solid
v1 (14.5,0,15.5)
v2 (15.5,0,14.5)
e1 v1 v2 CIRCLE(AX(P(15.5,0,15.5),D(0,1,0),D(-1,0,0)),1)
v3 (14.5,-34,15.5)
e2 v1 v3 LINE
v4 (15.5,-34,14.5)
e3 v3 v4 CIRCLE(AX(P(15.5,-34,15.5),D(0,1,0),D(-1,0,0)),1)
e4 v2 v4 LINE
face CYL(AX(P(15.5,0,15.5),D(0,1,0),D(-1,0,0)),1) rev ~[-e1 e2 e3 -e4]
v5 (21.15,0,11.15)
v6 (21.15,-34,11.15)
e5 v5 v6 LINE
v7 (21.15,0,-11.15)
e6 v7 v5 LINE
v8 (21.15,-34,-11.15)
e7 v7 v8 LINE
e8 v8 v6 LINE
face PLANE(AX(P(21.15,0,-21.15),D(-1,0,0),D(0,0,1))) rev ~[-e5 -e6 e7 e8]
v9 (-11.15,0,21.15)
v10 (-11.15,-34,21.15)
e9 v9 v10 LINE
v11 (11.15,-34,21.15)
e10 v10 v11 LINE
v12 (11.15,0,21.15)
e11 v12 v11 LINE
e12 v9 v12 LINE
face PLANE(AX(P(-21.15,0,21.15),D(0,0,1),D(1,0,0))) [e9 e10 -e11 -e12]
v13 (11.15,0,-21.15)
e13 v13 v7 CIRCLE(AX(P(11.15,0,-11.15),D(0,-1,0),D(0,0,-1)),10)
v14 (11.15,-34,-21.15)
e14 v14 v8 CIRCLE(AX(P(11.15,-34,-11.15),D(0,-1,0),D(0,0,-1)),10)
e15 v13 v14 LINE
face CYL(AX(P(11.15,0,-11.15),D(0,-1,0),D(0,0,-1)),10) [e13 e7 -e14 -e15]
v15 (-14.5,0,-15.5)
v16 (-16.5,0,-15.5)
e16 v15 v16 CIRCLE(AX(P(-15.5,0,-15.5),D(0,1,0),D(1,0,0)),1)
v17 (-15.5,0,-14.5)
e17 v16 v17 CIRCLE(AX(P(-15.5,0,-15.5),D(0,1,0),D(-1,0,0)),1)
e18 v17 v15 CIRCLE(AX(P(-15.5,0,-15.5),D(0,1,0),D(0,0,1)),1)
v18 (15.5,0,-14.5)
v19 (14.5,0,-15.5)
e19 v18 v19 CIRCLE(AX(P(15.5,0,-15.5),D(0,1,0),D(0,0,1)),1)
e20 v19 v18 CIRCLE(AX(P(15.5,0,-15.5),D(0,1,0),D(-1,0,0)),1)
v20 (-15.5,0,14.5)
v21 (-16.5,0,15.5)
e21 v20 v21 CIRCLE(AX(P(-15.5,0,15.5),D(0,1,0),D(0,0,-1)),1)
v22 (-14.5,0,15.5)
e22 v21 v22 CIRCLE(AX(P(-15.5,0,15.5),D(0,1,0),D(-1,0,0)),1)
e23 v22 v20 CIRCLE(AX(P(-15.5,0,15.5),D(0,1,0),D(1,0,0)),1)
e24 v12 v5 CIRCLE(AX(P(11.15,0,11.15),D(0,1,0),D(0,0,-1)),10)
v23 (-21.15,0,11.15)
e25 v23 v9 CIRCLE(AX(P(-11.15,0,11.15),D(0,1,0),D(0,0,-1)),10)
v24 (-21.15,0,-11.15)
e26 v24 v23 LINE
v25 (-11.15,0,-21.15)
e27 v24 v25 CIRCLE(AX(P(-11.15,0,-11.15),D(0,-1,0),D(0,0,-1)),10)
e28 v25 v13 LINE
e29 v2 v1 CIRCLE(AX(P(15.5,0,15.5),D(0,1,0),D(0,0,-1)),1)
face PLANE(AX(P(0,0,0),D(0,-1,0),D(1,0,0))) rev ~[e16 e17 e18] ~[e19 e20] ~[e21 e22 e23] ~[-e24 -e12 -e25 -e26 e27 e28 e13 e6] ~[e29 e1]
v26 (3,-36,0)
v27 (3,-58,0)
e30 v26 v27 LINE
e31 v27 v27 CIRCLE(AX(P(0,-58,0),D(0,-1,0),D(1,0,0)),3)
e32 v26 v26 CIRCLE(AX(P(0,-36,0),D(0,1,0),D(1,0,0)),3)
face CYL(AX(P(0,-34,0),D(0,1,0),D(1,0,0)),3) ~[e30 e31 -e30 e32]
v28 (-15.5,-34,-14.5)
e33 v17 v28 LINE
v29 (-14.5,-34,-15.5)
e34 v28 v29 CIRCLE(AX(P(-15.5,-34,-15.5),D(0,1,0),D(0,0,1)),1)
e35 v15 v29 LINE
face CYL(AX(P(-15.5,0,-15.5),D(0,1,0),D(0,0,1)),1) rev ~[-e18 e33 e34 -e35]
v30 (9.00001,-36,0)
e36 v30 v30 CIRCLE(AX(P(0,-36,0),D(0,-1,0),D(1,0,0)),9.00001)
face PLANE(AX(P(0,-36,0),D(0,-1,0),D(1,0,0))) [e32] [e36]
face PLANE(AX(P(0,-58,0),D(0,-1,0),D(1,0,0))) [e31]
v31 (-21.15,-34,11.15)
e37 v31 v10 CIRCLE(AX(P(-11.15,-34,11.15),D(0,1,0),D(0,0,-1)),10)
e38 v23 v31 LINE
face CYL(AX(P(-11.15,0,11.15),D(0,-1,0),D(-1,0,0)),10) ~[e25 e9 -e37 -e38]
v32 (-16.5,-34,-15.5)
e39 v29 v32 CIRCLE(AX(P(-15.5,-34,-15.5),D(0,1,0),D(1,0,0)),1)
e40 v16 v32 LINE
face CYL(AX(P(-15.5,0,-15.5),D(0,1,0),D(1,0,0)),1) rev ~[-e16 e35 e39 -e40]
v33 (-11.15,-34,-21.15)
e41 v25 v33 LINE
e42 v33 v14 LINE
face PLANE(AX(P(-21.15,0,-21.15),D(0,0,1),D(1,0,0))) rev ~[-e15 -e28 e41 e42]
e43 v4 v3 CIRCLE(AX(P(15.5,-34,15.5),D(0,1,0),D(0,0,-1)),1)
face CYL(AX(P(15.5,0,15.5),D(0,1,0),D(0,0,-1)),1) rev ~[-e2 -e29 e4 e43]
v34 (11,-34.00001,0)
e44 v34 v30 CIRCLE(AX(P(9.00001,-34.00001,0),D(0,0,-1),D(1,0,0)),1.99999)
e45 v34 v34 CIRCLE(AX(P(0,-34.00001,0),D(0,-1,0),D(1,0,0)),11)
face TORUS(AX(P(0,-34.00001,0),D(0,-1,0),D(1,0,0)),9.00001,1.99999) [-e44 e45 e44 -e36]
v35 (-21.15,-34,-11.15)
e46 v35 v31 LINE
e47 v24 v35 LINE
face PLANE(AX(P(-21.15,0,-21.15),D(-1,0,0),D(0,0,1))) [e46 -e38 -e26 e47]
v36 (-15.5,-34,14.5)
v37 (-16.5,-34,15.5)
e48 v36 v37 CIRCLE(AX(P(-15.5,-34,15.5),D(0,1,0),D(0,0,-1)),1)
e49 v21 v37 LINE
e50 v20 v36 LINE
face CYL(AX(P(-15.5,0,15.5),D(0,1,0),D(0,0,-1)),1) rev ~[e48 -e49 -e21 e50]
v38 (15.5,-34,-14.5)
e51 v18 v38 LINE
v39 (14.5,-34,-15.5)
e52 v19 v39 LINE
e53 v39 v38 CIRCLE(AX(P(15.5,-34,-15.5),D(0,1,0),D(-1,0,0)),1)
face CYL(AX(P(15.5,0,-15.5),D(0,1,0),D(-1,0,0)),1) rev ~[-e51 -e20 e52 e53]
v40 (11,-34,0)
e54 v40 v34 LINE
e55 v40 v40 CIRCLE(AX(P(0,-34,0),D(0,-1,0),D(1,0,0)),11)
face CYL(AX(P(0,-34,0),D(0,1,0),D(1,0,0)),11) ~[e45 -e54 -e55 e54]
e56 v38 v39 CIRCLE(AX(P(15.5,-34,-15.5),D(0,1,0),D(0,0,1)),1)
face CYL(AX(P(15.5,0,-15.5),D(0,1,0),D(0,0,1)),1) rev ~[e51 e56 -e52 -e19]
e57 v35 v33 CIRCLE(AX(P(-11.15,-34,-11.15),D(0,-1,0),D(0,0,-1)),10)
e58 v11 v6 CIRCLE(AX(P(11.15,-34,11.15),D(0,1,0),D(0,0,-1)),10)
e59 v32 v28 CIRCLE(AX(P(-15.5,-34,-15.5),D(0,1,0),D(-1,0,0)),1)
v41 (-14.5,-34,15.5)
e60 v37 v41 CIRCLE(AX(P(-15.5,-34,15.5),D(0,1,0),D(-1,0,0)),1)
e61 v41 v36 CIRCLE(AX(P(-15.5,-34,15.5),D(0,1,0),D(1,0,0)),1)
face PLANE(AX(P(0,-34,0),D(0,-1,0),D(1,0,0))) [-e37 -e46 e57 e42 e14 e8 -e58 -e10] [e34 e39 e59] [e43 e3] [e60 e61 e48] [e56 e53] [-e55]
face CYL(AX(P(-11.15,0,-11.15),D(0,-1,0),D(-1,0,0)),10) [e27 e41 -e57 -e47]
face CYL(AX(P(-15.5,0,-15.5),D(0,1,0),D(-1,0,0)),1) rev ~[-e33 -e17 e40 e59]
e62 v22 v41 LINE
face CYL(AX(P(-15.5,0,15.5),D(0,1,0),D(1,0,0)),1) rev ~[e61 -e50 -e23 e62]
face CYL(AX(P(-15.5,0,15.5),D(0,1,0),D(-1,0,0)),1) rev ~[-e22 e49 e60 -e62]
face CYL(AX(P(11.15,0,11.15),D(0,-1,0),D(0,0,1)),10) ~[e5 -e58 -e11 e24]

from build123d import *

# Parameters (mm, degrees)
F0_W     = 42.3
F0_H     = 42.3
F1_DEPTH = 34
F2_R     = 3
F3_DEPTH = 24
F5_DEPTH = 58.001
F6_R     = 11
F7_DEPTH = 2
F8_R     = 10
F9_R     = 1.99999


# Not quite as in the source:
# - a fillet or chamfer is up to 0.001 mm smaller than in the source, because OpenCascade refuses the exact size


with BuildPart() as f1:
    # F0 (on Front) → F1 (new body)
    with BuildSketch(Plane.XZ):
        Rectangle(F0_W, F0_H)
    extrude(amount=F1_DEPTH)

    # F2 (on face) → F3 (join)
    with BuildSketch(Plane.XZ.offset(34)):
        Circle(F2_R)
    extrude(amount=F3_DEPTH)

    # F4 (on face) → F5 (cut, through all)
    with BuildSketch(Plane(origin=(0, 0, 0), x_dir=(-1, 0, 0), z_dir=(0, 1, 0))):
        with BuildLine():
            Line((-15.5, 14.5), (-15.5, 15.5))
            Line((-15.5, 15.5), (-14.5, 15.5))
            ThreePointArc((-14.5, 15.5), (-16.2071067812, 16.2071067812), (-15.5, 14.5))
        make_face()
        with BuildLine():
            ThreePointArc((16.5, 15.5), (15.5, 16.5), (14.5, 15.5))
            Line((14.5, 15.5), (15.5, 15.5))
            Line((15.5, 15.5), (15.5, 14.5))
            ThreePointArc((15.5, 14.5), (16.2071067812, 14.7928932188), (16.5, 15.5))
        make_face()
        with BuildLine():
            Line((-15.5, -15.5), (-15.5, -14.5))
            ThreePointArc((-15.5, -14.5), (-16.2071067812, -16.2071067812), (-14.5, -15.5))
            Line((-14.5, -15.5), (-15.5, -15.5))
        make_face()
        with BuildLine():
            ThreePointArc((16.5, -15.5), (16.2071067812, -14.7928932188), (15.5, -14.5))
            Line((15.5, -14.5), (15.5, -15.5))
            Line((15.5, -15.5), (14.5, -15.5))
            ThreePointArc((14.5, -15.5), (15.5, -16.5), (16.5, -15.5))
        make_face()
        with BuildLine():
            Line((15.5, 15.5), (14.5, 15.5))
            ThreePointArc((14.5, 15.5), (14.7928932188, 14.7928932188), (15.5, 14.5))
            Line((15.5, 14.5), (15.5, 15.5))
        make_face()
        with BuildLine():
            Line((-14.5, 15.5), (-15.5, 15.5))
            Line((-15.5, 15.5), (-15.5, 14.5))
            ThreePointArc((-15.5, 14.5), (-14.7928932188, 14.7928932188), (-14.5, 15.5))
        make_face()
        with BuildLine():
            ThreePointArc((-14.5, -15.5), (-14.7928932188, -14.7928932188), (-15.5, -14.5))
            Line((-15.5, -14.5), (-15.5, -15.5))
            Line((-15.5, -15.5), (-14.5, -15.5))
        make_face()
        with BuildLine():
            Line((15.5, -15.5), (15.5, -14.5))
            ThreePointArc((15.5, -14.5), (14.7928932188, -14.7928932188), (14.5, -15.5))
            Line((14.5, -15.5), (15.5, -15.5))
        make_face()
    extrude(amount=-F5_DEPTH, mode=Mode.SUBTRACT)

    # F6 (on face) → F7 (join)
    with BuildSketch(Plane.XZ.offset(34)):
        Circle(F6_R)
    extrude(amount=F7_DEPTH)

    # F8
    f8_edges = [f1.edges().sort_by_distance(p)[0] for p in [
        (21.15, -17, 21.15),
        (-21.15, -17, 21.15),
        (21.15, -17, -21.15),
        (-21.15, -17, -21.15),
    ]]
    fillet(f8_edges, radius=F8_R)

    # F9 (radius 2 in the source; OpenCascade refuses exactly that, so slightly less here)
    f9_edges = [f1.edges().sort_by_distance(p)[0] for p in [
        (-11, -36, 0),
    ]]
    fillet(f9_edges, radius=F9_R)


solid = f1.part
